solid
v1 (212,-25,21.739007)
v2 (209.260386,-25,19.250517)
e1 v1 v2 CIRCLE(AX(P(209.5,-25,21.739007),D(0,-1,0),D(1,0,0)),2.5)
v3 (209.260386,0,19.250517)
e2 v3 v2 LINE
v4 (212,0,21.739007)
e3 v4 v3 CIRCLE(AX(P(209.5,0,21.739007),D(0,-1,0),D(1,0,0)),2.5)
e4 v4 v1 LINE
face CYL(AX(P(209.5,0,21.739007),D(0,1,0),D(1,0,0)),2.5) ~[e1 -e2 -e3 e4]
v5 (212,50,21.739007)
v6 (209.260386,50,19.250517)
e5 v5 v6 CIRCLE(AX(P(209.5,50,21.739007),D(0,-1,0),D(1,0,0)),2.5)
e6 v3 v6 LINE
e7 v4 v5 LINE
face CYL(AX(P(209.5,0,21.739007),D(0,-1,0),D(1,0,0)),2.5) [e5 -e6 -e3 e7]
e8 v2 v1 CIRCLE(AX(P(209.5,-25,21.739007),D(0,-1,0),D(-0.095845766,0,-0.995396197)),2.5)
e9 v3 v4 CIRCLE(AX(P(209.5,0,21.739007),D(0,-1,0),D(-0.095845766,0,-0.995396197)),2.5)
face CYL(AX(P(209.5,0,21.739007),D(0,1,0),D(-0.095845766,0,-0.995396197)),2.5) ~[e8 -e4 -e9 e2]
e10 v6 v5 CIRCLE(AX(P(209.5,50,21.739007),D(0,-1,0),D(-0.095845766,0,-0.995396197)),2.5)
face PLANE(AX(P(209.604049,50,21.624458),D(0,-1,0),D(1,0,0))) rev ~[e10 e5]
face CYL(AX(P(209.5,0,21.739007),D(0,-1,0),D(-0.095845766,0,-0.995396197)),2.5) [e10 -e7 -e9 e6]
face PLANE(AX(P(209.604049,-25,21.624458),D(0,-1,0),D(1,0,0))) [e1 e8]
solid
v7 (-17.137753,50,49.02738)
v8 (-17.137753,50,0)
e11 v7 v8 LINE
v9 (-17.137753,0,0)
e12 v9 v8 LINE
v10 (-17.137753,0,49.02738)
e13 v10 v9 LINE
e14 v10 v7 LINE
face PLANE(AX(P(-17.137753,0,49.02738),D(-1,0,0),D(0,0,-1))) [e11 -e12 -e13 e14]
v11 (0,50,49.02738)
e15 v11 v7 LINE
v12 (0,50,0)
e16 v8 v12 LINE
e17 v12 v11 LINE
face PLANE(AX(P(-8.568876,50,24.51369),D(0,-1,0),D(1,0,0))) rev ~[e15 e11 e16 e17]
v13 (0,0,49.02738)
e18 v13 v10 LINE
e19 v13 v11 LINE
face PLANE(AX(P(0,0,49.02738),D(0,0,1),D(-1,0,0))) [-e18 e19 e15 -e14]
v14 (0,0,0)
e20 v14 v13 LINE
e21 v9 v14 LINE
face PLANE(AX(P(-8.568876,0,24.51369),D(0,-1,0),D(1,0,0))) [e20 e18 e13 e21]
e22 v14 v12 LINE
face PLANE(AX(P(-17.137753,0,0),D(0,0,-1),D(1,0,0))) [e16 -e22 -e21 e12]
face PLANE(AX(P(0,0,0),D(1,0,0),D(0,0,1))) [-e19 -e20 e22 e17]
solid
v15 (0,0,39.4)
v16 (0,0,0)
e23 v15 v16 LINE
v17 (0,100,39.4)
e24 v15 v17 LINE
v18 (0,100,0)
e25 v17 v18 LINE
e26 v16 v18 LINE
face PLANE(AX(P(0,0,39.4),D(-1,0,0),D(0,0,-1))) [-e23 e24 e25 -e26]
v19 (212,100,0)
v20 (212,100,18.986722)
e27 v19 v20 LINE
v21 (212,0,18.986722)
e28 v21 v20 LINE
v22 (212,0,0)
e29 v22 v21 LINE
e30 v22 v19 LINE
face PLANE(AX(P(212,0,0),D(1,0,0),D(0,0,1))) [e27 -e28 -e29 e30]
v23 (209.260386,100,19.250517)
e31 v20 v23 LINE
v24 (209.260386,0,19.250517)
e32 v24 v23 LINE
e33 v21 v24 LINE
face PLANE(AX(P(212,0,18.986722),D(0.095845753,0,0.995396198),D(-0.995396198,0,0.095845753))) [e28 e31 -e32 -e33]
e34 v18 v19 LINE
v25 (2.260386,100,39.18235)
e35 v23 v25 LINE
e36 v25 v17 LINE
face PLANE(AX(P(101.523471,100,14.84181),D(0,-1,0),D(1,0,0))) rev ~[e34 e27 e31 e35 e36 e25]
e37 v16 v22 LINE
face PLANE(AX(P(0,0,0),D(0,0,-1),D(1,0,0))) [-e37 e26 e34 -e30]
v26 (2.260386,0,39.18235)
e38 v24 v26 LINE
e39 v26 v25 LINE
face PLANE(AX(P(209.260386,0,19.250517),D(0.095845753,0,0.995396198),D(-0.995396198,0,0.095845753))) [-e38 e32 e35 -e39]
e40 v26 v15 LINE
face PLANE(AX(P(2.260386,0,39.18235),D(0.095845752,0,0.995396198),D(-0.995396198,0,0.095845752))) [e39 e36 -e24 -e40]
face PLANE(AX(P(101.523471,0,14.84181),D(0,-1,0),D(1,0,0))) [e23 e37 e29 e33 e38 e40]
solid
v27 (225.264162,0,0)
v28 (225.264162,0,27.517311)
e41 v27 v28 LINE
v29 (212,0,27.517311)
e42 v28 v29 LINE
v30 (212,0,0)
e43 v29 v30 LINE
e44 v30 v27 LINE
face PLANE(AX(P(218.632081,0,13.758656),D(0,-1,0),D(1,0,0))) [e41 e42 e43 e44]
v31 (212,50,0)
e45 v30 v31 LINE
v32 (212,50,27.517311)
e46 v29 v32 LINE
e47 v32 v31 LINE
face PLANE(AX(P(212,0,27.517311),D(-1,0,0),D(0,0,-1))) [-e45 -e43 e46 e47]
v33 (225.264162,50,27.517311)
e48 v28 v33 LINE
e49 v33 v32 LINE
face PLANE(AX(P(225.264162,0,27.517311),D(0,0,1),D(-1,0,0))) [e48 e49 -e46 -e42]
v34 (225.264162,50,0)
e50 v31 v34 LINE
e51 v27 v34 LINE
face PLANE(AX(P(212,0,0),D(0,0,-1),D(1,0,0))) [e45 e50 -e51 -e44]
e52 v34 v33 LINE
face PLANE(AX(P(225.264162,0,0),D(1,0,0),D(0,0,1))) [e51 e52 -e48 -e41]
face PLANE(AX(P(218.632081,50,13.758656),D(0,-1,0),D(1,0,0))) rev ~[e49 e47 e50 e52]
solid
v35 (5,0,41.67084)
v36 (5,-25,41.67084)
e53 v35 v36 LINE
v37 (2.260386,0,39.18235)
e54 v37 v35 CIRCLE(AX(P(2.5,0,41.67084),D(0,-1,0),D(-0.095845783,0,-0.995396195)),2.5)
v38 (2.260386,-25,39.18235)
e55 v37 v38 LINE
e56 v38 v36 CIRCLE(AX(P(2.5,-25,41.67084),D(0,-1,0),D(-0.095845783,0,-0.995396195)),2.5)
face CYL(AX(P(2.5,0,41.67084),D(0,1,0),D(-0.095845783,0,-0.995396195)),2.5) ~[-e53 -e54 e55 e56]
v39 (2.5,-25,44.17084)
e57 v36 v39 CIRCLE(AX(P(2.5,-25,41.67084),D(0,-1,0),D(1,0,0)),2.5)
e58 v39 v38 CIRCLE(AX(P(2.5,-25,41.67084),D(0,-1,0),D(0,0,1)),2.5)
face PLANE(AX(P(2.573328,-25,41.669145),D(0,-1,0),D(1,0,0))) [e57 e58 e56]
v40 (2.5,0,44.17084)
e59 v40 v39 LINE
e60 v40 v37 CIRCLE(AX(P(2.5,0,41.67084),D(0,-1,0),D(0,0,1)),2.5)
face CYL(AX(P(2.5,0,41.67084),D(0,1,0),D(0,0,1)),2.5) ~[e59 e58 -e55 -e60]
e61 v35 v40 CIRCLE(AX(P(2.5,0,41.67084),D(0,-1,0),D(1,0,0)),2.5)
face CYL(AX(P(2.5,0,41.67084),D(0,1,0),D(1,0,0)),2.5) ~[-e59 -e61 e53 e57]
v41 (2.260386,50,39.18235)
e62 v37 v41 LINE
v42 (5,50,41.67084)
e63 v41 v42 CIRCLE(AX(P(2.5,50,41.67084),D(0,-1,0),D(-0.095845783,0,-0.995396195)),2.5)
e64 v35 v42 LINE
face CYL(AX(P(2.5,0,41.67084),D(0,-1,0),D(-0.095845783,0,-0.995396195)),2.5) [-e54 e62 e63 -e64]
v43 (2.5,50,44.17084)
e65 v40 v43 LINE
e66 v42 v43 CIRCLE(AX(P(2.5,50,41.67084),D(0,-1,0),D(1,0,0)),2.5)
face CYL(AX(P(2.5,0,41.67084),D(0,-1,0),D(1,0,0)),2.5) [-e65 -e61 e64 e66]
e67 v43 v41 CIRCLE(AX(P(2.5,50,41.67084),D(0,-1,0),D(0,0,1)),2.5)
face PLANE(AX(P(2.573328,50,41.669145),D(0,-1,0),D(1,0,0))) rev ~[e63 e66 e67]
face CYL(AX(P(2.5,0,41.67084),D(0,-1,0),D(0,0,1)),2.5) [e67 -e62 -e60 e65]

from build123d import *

# Parameters (mm, degrees)
F1_DEPTH      = 100
F2_DEPTH      = 25
F2_DEPTH_BACK = 50
F4_DEPTH      = 50


with BuildPart() as f1:
    # F0 (on Front) → F1 (new body)
    with BuildSketch(Plane.XZ):
        Polygon((0, 39.4), (0, 0), (212, 0), (212, 18.9867217821), (209.2603855849, 19.2505166466), (2.2603855436, 39.1823496275), align=None)
    extrude(amount=-F1_DEPTH)


with BuildPart() as f2:
    # F0 (on Front) → F2 (new body, two sides)
    with BuildSketch(Plane.XZ) as f2_sk:
        with BuildLine():
            ThreePointArc((2.5, 44.1708401161), (0.0028790356, 41.7907854751), (2.2603855436, 39.1823496275))
            ThreePointArc((2.2603855436, 39.1823496275), (4.1809169907, 39.820294772), (5, 41.6708401161))
            ThreePointArc((5, 41.6708401161), (4.267766953, 43.4386070691), (2.5, 44.1708401161))
        make_face()
    extrude(amount=F2_DEPTH)
    extrude(f2_sk.sketch, amount=-F2_DEPTH_BACK)


with BuildPart() as f2b:
    # F0 (on Front) → F2, piece 2 (new body, two sides)
    with BuildSketch(Plane.XZ) as f2_2_sk:
        with BuildLine():
            ThreePointArc((212, 21.7390071392), (207.819082994, 23.5895524694), (209.2603855849, 19.2505166466))
            ThreePointArc((209.2603855849, 19.2505166466), (211.180917006, 19.8884618091), (212, 21.7390071392))
        make_face()
    extrude(amount=F2_DEPTH)
    extrude(f2_2_sk.sketch, amount=-F2_DEPTH_BACK)


with BuildPart() as f4:
    # F3 (on face) → F4 (new body)
    with BuildSketch(Plane.XZ):
        Polygon((-17.1377528459, 0), (0, 0), (0, 39.4), (0, 49.0273796022), (-17.1377528459, 49.0273796022), align=None)
    extrude(amount=-F4_DEPTH)


with BuildPart() as f4b:
    # F3 (on face) → F4, piece 2 (new body)
    with BuildSketch(Plane.XZ):
        Polygon((212, 18.9867217821), (212, 0), (225.2641618252, 0), (225.2641618252, 27.517311275), (212, 27.517311275), align=None)
    extrude(amount=-F4_DEPTH)


solid = Compound([f1.part, f2.part, f2b.part, f4.part, f4b.part])
